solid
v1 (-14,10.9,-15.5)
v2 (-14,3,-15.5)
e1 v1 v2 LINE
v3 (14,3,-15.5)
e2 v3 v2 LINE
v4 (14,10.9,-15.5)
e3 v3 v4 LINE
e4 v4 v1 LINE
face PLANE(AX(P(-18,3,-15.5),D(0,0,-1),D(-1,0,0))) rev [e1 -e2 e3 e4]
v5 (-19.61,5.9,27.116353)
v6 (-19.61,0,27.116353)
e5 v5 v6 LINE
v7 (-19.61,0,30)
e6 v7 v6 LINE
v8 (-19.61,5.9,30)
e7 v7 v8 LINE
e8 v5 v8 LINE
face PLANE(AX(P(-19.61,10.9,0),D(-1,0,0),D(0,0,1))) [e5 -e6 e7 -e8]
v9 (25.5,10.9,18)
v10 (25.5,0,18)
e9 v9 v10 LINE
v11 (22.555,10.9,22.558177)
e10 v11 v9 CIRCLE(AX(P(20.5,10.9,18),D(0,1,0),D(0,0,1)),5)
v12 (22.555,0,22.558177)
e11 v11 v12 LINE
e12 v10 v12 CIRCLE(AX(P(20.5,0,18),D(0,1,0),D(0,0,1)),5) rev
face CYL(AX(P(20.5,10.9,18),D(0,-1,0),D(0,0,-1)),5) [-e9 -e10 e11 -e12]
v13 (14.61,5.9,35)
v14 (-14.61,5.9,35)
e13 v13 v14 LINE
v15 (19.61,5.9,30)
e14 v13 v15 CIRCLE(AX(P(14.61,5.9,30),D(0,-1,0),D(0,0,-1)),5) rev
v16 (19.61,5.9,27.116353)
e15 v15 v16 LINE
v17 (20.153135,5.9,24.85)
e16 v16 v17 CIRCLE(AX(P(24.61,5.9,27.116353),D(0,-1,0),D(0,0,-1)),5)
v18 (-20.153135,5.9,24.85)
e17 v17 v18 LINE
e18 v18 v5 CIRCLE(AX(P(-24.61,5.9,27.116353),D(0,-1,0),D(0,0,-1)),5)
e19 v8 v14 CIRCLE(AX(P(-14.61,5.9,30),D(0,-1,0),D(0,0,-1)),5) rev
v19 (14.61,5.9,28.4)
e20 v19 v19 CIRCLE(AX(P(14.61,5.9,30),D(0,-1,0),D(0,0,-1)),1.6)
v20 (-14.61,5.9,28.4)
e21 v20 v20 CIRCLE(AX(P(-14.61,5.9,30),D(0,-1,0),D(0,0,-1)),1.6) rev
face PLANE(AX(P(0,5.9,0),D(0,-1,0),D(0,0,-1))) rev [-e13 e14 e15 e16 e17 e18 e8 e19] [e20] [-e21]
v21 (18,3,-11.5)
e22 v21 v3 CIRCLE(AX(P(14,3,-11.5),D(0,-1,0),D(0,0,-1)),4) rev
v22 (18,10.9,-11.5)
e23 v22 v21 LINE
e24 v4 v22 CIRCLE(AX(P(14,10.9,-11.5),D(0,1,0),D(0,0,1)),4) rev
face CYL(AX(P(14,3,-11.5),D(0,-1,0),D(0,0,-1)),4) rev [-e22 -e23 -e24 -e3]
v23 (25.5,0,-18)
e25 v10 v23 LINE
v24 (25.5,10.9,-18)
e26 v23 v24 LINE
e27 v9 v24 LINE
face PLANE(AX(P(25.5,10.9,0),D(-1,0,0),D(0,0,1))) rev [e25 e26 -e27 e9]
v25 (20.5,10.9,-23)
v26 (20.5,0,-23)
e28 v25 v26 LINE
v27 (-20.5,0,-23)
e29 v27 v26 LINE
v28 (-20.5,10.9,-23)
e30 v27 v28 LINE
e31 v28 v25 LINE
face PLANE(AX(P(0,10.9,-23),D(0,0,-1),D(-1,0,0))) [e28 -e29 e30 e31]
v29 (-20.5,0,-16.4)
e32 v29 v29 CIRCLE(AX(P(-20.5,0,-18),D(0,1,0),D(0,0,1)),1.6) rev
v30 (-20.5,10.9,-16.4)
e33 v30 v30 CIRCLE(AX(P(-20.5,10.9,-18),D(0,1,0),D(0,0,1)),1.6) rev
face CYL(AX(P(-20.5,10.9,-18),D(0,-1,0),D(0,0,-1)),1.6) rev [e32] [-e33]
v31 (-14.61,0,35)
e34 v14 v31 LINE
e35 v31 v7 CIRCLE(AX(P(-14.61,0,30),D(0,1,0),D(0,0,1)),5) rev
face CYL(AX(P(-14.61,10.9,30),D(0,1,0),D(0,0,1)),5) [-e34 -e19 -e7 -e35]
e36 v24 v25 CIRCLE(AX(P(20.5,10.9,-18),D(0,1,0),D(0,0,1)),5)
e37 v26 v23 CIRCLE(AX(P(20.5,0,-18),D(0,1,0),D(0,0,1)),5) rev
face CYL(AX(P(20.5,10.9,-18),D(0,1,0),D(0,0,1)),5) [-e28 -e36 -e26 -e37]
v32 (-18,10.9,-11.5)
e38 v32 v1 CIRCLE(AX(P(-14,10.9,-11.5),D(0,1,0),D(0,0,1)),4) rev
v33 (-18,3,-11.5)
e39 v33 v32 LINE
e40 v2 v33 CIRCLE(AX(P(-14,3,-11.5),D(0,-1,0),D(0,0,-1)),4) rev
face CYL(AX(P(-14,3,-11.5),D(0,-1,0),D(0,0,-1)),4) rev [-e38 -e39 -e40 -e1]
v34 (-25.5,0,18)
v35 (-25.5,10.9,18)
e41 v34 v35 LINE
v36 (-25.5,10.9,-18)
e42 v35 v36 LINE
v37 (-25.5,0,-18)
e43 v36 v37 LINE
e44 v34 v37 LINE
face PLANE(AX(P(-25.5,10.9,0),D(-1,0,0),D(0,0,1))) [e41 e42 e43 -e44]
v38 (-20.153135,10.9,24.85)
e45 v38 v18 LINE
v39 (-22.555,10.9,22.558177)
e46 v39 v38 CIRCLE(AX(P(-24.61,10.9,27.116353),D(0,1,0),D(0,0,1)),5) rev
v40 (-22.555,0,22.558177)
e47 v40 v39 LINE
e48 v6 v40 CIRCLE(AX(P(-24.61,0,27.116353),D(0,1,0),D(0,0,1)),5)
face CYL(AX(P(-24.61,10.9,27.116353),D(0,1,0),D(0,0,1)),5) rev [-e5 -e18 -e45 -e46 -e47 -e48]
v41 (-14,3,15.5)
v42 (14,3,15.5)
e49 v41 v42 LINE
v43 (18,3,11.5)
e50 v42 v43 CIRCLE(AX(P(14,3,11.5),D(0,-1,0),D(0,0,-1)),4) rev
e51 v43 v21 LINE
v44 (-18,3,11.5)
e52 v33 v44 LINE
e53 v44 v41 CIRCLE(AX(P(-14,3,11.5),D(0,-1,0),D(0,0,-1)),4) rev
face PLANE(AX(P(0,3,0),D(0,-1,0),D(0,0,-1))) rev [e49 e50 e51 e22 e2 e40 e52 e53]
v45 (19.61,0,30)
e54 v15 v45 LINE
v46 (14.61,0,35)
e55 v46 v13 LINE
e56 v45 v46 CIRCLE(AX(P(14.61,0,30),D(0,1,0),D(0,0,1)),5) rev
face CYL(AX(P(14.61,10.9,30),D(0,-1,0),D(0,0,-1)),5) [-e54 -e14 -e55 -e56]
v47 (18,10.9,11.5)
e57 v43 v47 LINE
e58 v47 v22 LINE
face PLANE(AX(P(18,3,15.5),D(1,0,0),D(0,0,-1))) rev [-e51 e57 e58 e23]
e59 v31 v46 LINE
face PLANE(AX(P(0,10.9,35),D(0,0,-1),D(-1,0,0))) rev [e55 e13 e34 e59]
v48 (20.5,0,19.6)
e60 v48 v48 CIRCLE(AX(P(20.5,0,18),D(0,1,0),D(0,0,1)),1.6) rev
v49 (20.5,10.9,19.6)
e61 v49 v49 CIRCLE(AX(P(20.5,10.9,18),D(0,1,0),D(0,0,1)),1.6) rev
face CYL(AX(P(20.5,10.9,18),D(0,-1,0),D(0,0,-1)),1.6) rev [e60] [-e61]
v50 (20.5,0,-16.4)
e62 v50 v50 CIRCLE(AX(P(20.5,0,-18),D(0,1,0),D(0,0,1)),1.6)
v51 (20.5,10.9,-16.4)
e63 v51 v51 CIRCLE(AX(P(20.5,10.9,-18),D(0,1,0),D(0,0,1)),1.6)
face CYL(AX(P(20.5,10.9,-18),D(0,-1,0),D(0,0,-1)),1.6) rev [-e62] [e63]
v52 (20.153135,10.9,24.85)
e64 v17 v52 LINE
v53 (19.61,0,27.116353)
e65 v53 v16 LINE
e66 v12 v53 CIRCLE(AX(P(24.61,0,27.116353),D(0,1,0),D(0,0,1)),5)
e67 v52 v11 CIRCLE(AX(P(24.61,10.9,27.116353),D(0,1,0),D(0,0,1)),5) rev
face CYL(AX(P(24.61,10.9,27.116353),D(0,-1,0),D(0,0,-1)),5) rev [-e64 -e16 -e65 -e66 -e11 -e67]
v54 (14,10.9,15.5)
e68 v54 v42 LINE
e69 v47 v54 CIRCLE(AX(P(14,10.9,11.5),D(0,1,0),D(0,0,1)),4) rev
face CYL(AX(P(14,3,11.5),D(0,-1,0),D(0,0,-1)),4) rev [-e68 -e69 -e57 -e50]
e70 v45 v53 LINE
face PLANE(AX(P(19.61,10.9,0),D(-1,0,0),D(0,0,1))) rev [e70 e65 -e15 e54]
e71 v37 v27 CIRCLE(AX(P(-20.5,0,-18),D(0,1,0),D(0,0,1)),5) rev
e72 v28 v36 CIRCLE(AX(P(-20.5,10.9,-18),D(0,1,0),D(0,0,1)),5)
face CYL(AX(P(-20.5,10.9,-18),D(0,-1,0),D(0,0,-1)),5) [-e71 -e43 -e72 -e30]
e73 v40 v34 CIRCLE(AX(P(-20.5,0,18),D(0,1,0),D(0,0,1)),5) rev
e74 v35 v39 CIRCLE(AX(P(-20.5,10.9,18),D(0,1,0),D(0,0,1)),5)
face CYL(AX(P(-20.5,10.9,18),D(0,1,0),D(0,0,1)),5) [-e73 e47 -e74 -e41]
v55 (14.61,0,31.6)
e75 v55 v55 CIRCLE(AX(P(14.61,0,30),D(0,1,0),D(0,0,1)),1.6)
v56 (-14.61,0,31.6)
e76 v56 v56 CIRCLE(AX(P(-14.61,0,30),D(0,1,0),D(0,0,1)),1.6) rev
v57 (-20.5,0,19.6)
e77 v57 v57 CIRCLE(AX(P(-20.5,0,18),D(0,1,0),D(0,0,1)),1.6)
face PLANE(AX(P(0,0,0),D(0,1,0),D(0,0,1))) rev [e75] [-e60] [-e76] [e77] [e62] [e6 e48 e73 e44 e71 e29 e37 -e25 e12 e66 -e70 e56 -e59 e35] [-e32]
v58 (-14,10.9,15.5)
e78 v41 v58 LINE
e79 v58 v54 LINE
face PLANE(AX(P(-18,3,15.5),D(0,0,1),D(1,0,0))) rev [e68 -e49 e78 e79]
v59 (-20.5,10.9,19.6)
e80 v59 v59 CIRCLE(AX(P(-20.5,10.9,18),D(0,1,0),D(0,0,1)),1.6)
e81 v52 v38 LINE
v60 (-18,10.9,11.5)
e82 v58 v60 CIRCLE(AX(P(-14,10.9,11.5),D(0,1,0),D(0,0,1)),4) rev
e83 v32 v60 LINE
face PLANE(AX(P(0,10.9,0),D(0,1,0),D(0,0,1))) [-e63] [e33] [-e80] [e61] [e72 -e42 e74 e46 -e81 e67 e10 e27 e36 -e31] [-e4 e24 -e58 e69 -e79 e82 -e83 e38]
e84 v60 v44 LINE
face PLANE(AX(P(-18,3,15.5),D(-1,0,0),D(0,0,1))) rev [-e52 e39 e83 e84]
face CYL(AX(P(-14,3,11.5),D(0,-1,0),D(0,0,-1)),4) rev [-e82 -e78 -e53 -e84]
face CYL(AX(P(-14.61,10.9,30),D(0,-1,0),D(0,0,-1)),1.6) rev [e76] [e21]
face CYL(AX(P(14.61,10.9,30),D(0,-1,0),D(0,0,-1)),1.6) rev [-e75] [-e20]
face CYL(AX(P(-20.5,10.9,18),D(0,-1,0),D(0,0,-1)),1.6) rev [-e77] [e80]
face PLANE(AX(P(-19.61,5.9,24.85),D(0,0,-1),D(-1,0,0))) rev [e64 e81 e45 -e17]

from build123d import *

# Parameters (mm, degrees)
SKETCH_1_W          = 51
SKETCH_1_H          = 46
SKETCH_1_R          = 1.6
SKETCH_1_W_2        = 39.22
SKETCH_1_H_2        = 12
EXTRUDE_1_DEPTH     = 10.9
SKETCH_2_W          = 39.22
SKETCH_2_H          = 10.3
CUT_EXTRUDE_1_DEPTH = 5
FILLET_1_R          = 5
SKETCH_3_W          = 36
SKETCH_3_H          = 31
CUT_EXTRUDE_2_DEPTH = 7.9
FILLET_3_R          = 4
FILLET_2_R          = 5


with BuildPart() as part:
    # ｽｹｯﾁ1 → ﾎﾞｽ - 押し出し1 (new body)
    # profile 1 of 2: a face of its own
    with BuildSketch(Plane(origin=(0, 0, 0), x_dir=(1, 0, 0), z_dir=(0, 1, 0))):
        Rectangle(SKETCH_1_W, SKETCH_1_H)
        with Locations(Location((-20.5, 18, 0), (0, 0, 270))):
            Circle(SKETCH_1_R, mode=Mode.SUBTRACT)
        with Locations(Location((20.5, 18, 0), (0, 0, 270))):
            Circle(SKETCH_1_R, mode=Mode.SUBTRACT)
        with Locations(Location((-20.5, -18, 0), (0, 0, 270))):
            Circle(SKETCH_1_R, mode=Mode.SUBTRACT)
        with Locations(Location((20.5, -18, 0), (0, 0, 270))):
            Circle(SKETCH_1_R, mode=Mode.SUBTRACT)
    # profile 2 of 2: a face of its own
    with BuildSketch(Plane(origin=(0, 0, 0), x_dir=(1, 0, 0), z_dir=(0, 1, 0))):
        with Locations((0, -29)):
            Rectangle(SKETCH_1_W_2, SKETCH_1_H_2)
        with Locations(Location((-14.61, -30, 0), (0, 0, 270))):
            Circle(SKETCH_1_R, mode=Mode.SUBTRACT)
        with Locations(Location((14.61, -30, 0), (0, 0, 270))):
            Circle(SKETCH_1_R, mode=Mode.SUBTRACT)
    extrude(amount=EXTRUDE_1_DEPTH)

    # ｽｹｯﾁ2 → ｶｯﾄ - 押し出し1 (cut)
    with BuildSketch(Plane(origin=(0, 10.9, 0), x_dir=(1, 0, 0), z_dir=(0, 1, 0))):
        with Locations((0, -30)):
            Rectangle(SKETCH_2_W, SKETCH_2_H)
    extrude(amount=-CUT_EXTRUDE_1_DEPTH, mode=Mode.SUBTRACT)

    # ﾌｨﾚｯﾄ1
    fillet_1_edges = [part.edges().sort_by_distance(p)[0] for p in [
        (-25.5, 5.45, 23),
        (-25.5, 5.45, -23),
        (25.5, 5.45, -23),
        (25.5, 5.45, 23),
        (19.61, 2.95, 35),
        (-19.61, 2.95, 35),
    ]]
    fillet(fillet_1_edges, radius=FILLET_1_R)

    # ｽｹｯﾁ3 → ｶｯﾄ - 押し出し2 (cut)
    with BuildSketch(Plane(origin=(0, 10.9, 0), x_dir=(1, 0, 0), z_dir=(0, 1, 0))):
        Rectangle(SKETCH_3_W, SKETCH_3_H)
    extrude(amount=-CUT_EXTRUDE_2_DEPTH, mode=Mode.SUBTRACT)

    # ﾌｨﾚｯﾄ3
    fillet_3_edges = [part.edges().sort_by_distance(p)[0] for p in [
        (18, 6.95, -15.5),
        (18, 6.95, 15.5),
        (-18, 6.95, 15.5),
        (-18, 6.95, -15.5),
    ]]
    fillet(fillet_3_edges, radius=FILLET_3_R)

    # ﾌｨﾚｯﾄ2
    # the kernel refuses this fillet: 5 mm, written as the material it adds along each edge
    with BuildSketch(Plane(origin=(-19.61, 0, 23), x_dir=(-0.9889327426199618, 0, -0.14836451925632577), z_dir=(0, 1, 0))) as fillet_2_piece_1_section:
        with BuildLine():
            CenterArc((4.333942914, 4.812619291), FILLET_2_R, 188.532159938, 65.732331269)
            Line((-0.610720799, 4.070796695), (-1.10518717, 3.996614435))
            Line((-1.10518717, 3.996614435), (-0.494466371, -0.07418226))
            Line((-0.494466371, -0.07418226), (0.07418226, -0.494466371))
            ThreePointArc((0.07418226, -0.494466371), (0.954332401, -0.362421949), (2.842359317, -0.481261929))
            Line((2.842359317, -0.481261929), (2.977957826, 0))
        make_face()
    fillet_2_piece_1 = extrude(amount=10.9, mode=Mode.PRIVATE)
    fillet_2_piece_1 = split(fillet_2_piece_1, bisect_by=Plane(origin=(-20.366453669, 5.9, 23.394752077), z_dir=(0, -1, 0)), keep=Keep.TOP, mode=Mode.PRIVATE)
    fillet_2_piece_1 = split(fillet_2_piece_1, bisect_by=Plane(origin=(-20.366453669, 2.95, 24.85), z_dir=(0, 0, -1)), keep=Keep.TOP, mode=Mode.PRIVATE)
    add(fillet_2_piece_1)
    with BuildSketch(Plane(origin=(-19.61, 0, 23), x_dir=(-0.9889327426199618, 0, -0.14836451925632577), z_dir=(0, 1, 0))) as fillet_2_piece_2_section:
        with BuildLine():
            CenterArc((4.333942914, 4.812619291), FILLET_2_R, 188.532159938, 65.732331269)
            Line((-0.610720799, 4.070796695), (-1.10518717, 3.996614435))
            Line((-1.10518717, 3.996614435), (-0.494466371, -0.07418226))
            Line((-0.494466371, -0.07418226), (0.07418226, -0.494466371))
            ThreePointArc((0.07418226, -0.494466371), (0.954332401, -0.362421949), (2.842359317, -0.481261929))
            Line((2.842359317, -0.481261929), (2.977957826, 0))
        make_face()
    fillet_2_piece_2 = extrude(amount=10.9, mode=Mode.PRIVATE)
    fillet_2_piece_2 = split(fillet_2_piece_2, bisect_by=Plane(origin=(-19.467497884, 5.9, 25.833436825), z_dir=(0, -1, 0)), keep=Keep.TOP, mode=Mode.PRIVATE)
    fillet_2_piece_2 = split(fillet_2_piece_2, bisect_by=Plane(origin=(-19.467497884, 2.95, 24.85), z_dir=(0, 0, 1)), keep=Keep.TOP, mode=Mode.PRIVATE)
    add(fillet_2_piece_2)
    with BuildSketch(Plane(origin=(-19.61, 0, 23), x_dir=(-0.9889327426199618, 0, -0.14836451925632577), z_dir=(0, 1, 0))) as fillet_2_piece_3_section:
        with BuildLine():
            CenterArc((4.333942914, 4.812619291), FILLET_2_R, 188.532159938, 65.732331269)
            Line((-0.610720799, 4.070796695), (-1.10518717, 3.996614435))
            Line((-1.10518717, 3.996614435), (-0.494466371, -0.07418226))
            Line((-0.494466371, -0.07418226), (0.07418226, -0.494466371))
            ThreePointArc((0.07418226, -0.494466371), (0.954332401, -0.362421949), (2.842359317, -0.481261929))
            Line((2.842359317, -0.481261929), (2.977957826, 0))
        make_face()
    fillet_2_piece_3 = extrude(amount=10.9, mode=Mode.PRIVATE)
    fillet_2_piece_3 = split(fillet_2_piece_3, bisect_by=Plane(origin=(-20.366453669, 5.9, 23.394752077), z_dir=(0, 1, 0)), keep=Keep.TOP, mode=Mode.PRIVATE)
    fillet_2_piece_3 = split(fillet_2_piece_3, bisect_by=Plane(origin=(-20.366453669, 8.4, 24.85), z_dir=(0, 0, -1)), keep=Keep.TOP, mode=Mode.PRIVATE)
    add(fillet_2_piece_3)
    with BuildSketch(Plane(origin=(19.61, 0, 23), x_dir=(0, 0, 1), z_dir=(0, 1, 0))) as fillet_2_piece_4_section:
        with BuildLine():
            CenterArc((4.116353438, 5), FILLET_2_R, 204.267668731, 65.732331269)
            Line((-0.441823281, 2.945), (-0.897640953, 2.7395))
            ThreePointArc((-0.897640953, 2.7395), (-0.5, 0.89), (-0.5, 0))
            Line((-0.5, 0), (0, -0.5))
            Line((0, -0.5), (4.116353438, -0.5))
            Line((4.116353438, -0.5), (4.116353438, 0))
        make_face()
    fillet_2_piece_4 = extrude(amount=10.9, mode=Mode.PRIVATE)
    fillet_2_piece_4 = split(fillet_2_piece_4, bisect_by=Plane(origin=(19.467497884, 2.95, 24.85), z_dir=(0, 0, 1)), keep=Keep.TOP, mode=Mode.PRIVATE)
    fillet_2_piece_4 = split(fillet_2_piece_4, bisect_by=Plane(origin=(19.467497884, 5.9, 25.833436825), z_dir=(0, -1, 0)), keep=Keep.TOP, mode=Mode.PRIVATE)
    add(fillet_2_piece_4)
    with BuildSketch(Plane(origin=(19.61, 0, 23), x_dir=(0, 0, 1), z_dir=(0, 1, 0))) as fillet_2_piece_5_section:
        with BuildLine():
            CenterArc((4.116353438, 5), FILLET_2_R, 204.267668731, 65.732331269)
            Line((-0.441823281, 2.945), (-0.897640953, 2.7395))
            ThreePointArc((-0.897640953, 2.7395), (-0.5, 0.89), (-0.5, 0))
            Line((-0.5, 0), (0, -0.5))
            Line((0, -0.5), (4.116353438, -0.5))
            Line((4.116353438, -0.5), (4.116353438, 0))
        make_face()
    fillet_2_piece_5 = extrude(amount=10.9, mode=Mode.PRIVATE)
    fillet_2_piece_5 = split(fillet_2_piece_5, bisect_by=Plane(origin=(20.366453669, 2.95, 24.85), z_dir=(0, 0, -1)), keep=Keep.TOP, mode=Mode.PRIVATE)
    fillet_2_piece_5 = split(fillet_2_piece_5, bisect_by=Plane(origin=(20.366453669, 5.9, 23.394752077), z_dir=(0, -1, 0)), keep=Keep.TOP, mode=Mode.PRIVATE)
    add(fillet_2_piece_5)
    with BuildSketch(Plane(origin=(19.61, 0, 23), x_dir=(0, 0, 1), z_dir=(0, 1, 0))) as fillet_2_piece_6_section:
        with BuildLine():
            CenterArc((4.116353438, 5), FILLET_2_R, 204.267668731, 65.732331269)
            Line((-0.441823281, 2.945), (-0.897640953, 2.7395))
            ThreePointArc((-0.897640953, 2.7395), (-0.5, 0.89), (-0.5, 0))
            Line((-0.5, 0), (0, -0.5))
            Line((0, -0.5), (4.116353438, -0.5))
            Line((4.116353438, -0.5), (4.116353438, 0))
        make_face()
    fillet_2_piece_6 = extrude(amount=10.9, mode=Mode.PRIVATE)
    fillet_2_piece_6 = split(fillet_2_piece_6, bisect_by=Plane(origin=(20.366453669, 8.4, 24.85), z_dir=(0, 0, -1)), keep=Keep.TOP, mode=Mode.PRIVATE)
    fillet_2_piece_6 = split(fillet_2_piece_6, bisect_by=Plane(origin=(20.366453669, 5.9, 23.394752077), z_dir=(0, 1, 0)), keep=Keep.TOP, mode=Mode.PRIVATE)
    add(fillet_2_piece_6)


solid = part.part
